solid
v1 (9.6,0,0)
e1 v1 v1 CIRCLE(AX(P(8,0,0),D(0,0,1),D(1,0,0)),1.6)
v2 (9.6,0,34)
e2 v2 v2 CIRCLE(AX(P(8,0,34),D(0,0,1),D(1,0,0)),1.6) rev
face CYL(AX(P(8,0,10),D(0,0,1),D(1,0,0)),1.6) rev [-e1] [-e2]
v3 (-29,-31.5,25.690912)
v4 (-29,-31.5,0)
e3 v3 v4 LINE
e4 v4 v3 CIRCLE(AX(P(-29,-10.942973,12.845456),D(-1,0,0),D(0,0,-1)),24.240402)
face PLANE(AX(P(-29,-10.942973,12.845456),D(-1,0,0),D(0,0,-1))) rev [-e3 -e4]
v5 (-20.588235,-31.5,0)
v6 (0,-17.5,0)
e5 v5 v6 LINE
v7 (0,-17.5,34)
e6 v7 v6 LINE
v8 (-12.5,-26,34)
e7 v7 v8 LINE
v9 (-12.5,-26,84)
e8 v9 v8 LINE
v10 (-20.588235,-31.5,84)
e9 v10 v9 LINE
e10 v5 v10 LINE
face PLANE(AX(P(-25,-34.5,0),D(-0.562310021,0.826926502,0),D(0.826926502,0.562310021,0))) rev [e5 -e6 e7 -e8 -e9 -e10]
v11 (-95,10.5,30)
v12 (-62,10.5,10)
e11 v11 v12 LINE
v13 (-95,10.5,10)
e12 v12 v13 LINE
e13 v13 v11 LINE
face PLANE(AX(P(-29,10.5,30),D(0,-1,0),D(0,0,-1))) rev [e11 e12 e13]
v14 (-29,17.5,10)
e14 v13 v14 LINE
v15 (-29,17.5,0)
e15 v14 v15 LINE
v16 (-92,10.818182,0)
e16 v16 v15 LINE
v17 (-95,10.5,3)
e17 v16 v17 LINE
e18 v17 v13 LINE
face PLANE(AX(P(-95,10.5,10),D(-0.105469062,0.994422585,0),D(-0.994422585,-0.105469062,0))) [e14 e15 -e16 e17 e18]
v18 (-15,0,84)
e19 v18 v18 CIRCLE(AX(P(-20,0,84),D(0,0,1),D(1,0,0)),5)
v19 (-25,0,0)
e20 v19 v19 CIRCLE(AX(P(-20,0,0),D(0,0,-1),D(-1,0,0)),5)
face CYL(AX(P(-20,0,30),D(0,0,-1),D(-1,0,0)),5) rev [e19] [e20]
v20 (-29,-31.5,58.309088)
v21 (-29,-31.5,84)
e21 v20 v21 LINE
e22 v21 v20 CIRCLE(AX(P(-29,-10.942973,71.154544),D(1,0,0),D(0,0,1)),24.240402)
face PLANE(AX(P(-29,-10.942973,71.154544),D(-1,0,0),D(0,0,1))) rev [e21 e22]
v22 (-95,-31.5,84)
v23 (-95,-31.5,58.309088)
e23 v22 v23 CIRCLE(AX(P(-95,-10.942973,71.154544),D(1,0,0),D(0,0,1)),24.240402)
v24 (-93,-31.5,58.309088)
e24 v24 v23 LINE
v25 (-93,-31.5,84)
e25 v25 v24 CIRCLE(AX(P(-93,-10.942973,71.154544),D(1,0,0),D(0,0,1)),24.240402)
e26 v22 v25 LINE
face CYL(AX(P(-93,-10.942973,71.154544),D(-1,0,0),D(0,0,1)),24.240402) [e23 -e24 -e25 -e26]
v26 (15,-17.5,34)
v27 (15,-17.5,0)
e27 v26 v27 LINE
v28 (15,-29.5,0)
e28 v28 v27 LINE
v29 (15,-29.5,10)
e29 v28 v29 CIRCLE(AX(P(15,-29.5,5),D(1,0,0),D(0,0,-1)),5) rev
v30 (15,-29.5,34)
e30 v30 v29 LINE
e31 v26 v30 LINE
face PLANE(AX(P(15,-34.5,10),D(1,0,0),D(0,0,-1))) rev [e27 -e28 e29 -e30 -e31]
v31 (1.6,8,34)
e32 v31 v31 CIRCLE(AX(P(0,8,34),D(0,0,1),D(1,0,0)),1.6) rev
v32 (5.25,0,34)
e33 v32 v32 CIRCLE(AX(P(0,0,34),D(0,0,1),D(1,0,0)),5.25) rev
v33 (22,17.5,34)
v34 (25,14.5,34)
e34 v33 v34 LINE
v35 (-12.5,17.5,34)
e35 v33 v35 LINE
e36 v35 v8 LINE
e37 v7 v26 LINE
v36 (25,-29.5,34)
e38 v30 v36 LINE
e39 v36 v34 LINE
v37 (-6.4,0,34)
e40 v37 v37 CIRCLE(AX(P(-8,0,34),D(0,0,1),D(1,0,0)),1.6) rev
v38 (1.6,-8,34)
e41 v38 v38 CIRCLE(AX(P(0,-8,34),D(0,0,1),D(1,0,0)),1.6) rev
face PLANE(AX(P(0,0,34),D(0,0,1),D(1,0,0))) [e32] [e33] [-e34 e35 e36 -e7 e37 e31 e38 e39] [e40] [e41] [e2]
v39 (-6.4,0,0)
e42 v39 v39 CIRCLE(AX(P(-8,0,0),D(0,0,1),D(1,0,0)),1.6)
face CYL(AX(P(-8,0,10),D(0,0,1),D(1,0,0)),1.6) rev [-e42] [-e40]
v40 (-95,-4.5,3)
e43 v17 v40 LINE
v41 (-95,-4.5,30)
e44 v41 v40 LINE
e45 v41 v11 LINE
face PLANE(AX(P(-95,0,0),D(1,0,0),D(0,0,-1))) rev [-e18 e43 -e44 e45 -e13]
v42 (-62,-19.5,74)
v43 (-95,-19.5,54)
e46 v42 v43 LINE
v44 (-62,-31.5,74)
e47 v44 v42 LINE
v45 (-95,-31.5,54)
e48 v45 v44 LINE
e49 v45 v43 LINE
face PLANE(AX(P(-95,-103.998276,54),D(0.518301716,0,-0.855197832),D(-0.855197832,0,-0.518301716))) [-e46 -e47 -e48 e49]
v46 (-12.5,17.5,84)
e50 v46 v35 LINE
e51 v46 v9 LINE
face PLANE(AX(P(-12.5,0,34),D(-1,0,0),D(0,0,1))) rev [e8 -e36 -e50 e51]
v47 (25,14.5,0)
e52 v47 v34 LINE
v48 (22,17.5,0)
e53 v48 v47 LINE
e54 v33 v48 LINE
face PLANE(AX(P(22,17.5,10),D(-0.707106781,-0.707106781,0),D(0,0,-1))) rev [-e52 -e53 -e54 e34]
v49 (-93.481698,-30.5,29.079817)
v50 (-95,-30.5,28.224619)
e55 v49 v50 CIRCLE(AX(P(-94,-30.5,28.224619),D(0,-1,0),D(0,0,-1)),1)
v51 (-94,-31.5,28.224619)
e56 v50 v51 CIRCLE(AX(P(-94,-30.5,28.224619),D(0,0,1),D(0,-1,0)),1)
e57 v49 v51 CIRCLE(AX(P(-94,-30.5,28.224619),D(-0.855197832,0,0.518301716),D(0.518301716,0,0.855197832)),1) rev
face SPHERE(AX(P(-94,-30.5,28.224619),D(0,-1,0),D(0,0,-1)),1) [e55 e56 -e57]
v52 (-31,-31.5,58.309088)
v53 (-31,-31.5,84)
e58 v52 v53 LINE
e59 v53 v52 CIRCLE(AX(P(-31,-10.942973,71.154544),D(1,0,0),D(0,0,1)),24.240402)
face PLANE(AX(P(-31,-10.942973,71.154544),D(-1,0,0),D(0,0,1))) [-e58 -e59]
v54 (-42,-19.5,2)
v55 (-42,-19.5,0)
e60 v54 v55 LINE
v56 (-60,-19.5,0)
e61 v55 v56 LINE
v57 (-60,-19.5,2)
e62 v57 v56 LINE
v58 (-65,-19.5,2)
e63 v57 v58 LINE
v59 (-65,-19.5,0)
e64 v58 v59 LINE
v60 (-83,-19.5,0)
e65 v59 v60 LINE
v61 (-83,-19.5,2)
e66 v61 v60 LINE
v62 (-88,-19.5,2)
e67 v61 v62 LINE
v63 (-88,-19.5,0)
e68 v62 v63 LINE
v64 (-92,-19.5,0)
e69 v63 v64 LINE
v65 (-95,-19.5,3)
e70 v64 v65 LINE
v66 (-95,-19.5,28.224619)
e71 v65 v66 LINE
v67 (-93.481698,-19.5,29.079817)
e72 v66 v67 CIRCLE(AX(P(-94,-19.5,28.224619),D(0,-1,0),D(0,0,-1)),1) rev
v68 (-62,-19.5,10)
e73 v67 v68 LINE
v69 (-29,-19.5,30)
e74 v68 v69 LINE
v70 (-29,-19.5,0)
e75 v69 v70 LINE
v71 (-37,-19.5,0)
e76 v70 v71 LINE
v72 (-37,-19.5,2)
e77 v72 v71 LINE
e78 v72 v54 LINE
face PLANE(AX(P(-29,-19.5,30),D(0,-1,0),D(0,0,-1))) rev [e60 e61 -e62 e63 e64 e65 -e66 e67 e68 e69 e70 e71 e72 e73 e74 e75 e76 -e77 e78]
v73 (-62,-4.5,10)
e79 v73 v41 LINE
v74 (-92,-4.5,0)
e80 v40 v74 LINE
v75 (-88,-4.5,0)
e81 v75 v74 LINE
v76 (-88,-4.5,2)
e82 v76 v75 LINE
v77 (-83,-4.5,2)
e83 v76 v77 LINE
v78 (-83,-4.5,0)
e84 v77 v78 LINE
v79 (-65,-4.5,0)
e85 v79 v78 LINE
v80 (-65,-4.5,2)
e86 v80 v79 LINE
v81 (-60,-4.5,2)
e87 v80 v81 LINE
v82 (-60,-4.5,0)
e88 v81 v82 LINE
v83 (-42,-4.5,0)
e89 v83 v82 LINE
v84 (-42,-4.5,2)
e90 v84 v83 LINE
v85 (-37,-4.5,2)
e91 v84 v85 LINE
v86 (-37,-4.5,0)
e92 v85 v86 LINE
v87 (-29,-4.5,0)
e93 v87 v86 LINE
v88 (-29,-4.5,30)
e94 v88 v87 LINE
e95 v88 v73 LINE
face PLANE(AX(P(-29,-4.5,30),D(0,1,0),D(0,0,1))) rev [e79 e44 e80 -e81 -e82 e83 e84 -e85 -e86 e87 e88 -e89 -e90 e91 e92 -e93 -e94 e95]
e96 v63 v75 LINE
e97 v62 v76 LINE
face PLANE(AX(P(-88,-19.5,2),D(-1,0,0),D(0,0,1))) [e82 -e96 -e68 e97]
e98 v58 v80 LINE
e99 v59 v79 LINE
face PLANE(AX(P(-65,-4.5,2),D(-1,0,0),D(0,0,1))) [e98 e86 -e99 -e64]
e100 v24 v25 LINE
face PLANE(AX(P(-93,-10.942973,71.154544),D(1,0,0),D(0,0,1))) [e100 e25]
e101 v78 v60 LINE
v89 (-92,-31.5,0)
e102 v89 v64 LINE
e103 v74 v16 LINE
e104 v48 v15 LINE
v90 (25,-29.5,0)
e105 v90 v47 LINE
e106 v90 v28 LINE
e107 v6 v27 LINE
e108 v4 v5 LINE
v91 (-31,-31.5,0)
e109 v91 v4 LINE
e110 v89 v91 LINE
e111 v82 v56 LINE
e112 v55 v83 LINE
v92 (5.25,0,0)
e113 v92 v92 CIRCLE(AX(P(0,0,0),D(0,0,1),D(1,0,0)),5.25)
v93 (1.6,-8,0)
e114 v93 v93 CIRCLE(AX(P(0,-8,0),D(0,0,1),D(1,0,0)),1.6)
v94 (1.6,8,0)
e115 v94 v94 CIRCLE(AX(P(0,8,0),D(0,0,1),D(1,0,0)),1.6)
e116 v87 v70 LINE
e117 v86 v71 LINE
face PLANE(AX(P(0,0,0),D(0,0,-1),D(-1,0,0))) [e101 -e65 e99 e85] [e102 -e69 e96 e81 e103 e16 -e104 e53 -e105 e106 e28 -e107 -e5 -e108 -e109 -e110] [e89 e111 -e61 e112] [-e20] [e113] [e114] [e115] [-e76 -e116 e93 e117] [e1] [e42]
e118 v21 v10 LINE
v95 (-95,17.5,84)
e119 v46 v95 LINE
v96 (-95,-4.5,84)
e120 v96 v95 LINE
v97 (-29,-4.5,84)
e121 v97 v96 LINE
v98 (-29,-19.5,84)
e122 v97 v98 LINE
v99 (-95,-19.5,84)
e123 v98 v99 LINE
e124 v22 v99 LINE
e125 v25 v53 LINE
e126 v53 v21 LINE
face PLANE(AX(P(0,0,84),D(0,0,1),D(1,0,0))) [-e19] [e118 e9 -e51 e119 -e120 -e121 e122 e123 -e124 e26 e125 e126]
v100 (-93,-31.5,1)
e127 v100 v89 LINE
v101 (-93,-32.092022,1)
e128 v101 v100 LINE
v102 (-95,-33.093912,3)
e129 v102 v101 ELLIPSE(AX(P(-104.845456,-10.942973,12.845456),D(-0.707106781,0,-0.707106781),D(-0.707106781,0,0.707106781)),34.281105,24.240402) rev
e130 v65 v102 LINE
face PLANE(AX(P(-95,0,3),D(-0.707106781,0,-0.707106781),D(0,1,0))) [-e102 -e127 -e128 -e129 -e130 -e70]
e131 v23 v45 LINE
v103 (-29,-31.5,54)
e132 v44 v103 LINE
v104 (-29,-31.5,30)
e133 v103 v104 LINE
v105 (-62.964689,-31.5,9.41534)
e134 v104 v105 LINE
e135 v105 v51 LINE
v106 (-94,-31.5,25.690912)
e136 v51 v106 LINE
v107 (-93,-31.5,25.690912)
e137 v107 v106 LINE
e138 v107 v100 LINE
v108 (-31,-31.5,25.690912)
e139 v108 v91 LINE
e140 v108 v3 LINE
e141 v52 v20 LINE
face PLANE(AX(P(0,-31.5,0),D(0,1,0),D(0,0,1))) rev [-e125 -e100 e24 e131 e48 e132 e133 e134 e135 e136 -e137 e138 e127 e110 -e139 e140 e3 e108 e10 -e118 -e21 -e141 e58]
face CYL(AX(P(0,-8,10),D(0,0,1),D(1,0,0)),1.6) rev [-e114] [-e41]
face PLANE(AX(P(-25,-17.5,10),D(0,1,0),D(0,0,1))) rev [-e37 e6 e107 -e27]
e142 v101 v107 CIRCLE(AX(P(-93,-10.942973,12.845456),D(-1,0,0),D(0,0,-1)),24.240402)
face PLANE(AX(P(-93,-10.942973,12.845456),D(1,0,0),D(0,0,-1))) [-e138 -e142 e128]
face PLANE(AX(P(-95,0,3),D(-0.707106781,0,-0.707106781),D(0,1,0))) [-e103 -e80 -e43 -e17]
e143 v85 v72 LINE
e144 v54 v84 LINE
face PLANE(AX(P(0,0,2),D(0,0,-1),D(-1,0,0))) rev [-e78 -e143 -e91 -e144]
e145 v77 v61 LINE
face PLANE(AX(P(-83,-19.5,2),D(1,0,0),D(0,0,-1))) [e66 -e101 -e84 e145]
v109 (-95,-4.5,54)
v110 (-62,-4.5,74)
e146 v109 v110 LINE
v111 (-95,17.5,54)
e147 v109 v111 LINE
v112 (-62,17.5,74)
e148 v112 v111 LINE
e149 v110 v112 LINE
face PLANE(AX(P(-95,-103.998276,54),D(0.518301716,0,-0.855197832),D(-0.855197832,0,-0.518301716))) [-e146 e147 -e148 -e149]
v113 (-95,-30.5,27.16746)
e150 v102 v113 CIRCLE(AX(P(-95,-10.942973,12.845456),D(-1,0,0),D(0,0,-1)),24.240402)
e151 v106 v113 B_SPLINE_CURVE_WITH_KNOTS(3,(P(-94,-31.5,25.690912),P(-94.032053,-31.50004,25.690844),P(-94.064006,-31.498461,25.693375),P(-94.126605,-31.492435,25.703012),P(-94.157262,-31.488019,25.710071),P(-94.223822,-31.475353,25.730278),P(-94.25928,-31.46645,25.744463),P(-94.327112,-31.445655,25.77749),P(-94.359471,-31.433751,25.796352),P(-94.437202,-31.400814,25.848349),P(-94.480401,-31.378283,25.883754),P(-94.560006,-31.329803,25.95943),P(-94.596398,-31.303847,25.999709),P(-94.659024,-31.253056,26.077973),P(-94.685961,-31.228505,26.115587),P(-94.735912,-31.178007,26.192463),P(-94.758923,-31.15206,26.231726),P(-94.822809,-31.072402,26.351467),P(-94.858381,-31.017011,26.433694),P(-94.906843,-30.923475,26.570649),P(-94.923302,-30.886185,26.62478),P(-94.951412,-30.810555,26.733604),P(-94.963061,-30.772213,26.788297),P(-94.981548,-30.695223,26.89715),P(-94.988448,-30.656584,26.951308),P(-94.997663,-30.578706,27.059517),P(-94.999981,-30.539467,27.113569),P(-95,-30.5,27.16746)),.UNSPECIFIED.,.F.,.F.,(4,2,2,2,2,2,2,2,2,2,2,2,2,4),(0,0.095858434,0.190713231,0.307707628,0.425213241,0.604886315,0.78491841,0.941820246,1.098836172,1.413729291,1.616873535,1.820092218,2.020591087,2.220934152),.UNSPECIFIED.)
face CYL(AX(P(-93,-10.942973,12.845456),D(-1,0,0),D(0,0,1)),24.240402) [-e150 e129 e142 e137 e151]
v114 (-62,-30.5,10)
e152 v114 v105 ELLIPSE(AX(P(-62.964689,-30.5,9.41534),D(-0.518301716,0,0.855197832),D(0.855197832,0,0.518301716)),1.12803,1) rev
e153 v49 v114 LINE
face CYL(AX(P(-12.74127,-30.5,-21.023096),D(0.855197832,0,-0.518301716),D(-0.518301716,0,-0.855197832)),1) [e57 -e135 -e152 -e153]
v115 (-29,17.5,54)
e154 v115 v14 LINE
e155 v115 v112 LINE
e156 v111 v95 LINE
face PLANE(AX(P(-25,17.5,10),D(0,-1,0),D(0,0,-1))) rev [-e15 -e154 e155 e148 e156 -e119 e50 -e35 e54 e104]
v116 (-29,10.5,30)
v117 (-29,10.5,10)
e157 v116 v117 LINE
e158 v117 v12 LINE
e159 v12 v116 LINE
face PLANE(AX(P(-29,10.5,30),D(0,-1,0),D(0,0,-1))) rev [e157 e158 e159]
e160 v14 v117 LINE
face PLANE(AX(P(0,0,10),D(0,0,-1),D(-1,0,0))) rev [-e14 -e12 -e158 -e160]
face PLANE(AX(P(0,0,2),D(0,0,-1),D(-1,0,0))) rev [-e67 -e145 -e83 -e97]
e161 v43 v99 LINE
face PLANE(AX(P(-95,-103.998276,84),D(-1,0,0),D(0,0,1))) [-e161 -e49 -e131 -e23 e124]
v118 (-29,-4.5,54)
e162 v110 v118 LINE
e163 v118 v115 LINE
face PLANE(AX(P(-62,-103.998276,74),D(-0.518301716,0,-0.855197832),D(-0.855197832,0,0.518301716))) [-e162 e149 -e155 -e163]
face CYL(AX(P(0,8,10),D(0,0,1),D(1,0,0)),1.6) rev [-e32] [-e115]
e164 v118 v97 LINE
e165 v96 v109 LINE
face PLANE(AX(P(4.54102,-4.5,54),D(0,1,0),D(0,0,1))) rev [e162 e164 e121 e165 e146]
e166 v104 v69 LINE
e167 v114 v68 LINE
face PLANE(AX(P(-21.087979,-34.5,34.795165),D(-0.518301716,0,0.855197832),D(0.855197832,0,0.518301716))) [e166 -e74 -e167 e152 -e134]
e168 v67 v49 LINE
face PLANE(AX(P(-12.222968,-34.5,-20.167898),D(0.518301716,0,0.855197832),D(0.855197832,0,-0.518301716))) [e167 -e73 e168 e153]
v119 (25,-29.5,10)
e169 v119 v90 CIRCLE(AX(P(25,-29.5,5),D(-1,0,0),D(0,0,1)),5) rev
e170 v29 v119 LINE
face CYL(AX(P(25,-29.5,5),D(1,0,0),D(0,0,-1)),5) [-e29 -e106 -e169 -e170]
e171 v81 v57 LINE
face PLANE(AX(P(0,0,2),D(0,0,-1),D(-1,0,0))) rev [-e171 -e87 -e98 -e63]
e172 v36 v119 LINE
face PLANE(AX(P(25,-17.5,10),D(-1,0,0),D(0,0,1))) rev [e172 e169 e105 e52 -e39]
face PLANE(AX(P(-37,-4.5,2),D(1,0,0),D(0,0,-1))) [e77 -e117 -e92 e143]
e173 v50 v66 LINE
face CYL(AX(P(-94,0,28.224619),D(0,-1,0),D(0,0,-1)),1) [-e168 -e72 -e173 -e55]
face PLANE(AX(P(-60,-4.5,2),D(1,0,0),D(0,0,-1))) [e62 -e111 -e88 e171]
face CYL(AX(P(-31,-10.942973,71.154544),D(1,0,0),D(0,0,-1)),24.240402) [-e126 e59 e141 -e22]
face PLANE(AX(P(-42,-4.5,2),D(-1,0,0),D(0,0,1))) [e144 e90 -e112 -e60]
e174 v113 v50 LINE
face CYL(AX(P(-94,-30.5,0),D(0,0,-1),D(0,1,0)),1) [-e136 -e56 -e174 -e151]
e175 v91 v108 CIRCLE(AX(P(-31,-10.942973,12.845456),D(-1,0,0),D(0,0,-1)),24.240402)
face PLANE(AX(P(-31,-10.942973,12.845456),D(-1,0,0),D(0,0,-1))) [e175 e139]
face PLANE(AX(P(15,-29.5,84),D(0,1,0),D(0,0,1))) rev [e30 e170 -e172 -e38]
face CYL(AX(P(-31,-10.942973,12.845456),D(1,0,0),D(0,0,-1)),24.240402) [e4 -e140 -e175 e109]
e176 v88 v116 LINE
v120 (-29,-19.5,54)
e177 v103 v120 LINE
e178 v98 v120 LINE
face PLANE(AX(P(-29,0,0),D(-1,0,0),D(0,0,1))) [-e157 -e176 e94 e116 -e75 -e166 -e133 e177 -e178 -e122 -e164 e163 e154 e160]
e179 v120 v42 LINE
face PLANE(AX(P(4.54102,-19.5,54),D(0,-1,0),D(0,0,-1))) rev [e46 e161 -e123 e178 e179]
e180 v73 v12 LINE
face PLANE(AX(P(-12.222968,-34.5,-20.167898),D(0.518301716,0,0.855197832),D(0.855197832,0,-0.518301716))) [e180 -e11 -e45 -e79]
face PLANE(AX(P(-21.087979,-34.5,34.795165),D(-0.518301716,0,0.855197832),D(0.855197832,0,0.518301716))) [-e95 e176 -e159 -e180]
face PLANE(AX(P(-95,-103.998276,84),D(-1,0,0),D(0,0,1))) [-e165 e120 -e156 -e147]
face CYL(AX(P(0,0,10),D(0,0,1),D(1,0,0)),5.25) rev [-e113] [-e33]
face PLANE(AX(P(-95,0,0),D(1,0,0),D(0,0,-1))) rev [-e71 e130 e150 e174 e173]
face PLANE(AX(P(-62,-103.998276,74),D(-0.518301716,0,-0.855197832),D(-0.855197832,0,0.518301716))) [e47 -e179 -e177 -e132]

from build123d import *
from build123d.topology import SkipClean

# Parameters (mm, degrees)
SKETCH_1_W            = 50
SKETCH_1_H            = 35
EXTRUDE_1_DEPTH       = 10
HOLE_WIZARD_370_D     = 10.5
HOLE_WIZARD_475_D     = 3.2
SKETCH_6_W            = 10
SKETCH_6_H            = 52
EXTRUDE_2_DEPTH       = 70
EXTRUDE_3_DEPTH       = 52
SKETCH_10_W           = 30
SKETCH_10_H           = 15
SKETCH_10_H_2         = 7
CUT_EXTRUDE_1_DEPTH   = 66
SKETCH_12_W           = 5
SKETCH_12_H           = 15
EXTRUDE_4_DEPTH       = 2
EXTRUDE_5_DEPTH       = 10
RIB_6_REACH           = 107.429
SKETCH_15_WALL_W      = 243.090204886
SKETCH_15_WALL_H      = 10
SKETCH_16_W           = 10
SKETCH_16_H           = 10
EXTRUDE_6_DEPTH       = 17
FILLET_1_RADIUS       = 5
FILLET_1_LENGTH       = 10
CUT_EXTRUDE_3_DEPTH   = 3
EXTRUDE_8_DEPTH       = 2
FILLET_3_R            = 1
SKETCH_20_R           = 5
CUT_EXTRUDE_4_DEPTH   = 106.654483654
CHAMFER_3_SIZE        = 3
SKETCH_22_R           = 1.6
SKETCH_22_R_2         = 4.65
SKETCH_22_R_3         = 5.25
EXTRUDE_9_DEPTH       = 74
EXTRUDE_10_DEPTH      = 49
SKETCH_25_W           = 30
SKETCH_25_H           = 15
CUT_EXTRUDE_5_DEPTH   = 66
SKETCH_26_R           = 12.5
CUT_EXTRUDE_6_DEPTH   = 50
SKETCH_27_W           = 25
SKETCH_27_H           = 70.37051412
SKETCH_27_W_2         = 27.110275364
CUT_EXTRUDE_7_DEPTH   = 50
SKETCH_28_R           = 5
CUT_EXTRUDE_8_DEPTH   = 132.601177488
MIRROR_2_COPY_1_DEPTH = 2


with BuildPart() as part:
    # 草图1 → 凸台-拉伸1 (new body)
    with BuildSketch(Plane.XY):
        Rectangle(SKETCH_1_W, SKETCH_1_H)
    extrude(amount=EXTRUDE_1_DEPTH)

    # Hole Wizard 370 (through all)
    with Locations(Plane.XY.offset(10)):
        with Locations((0, 0)):
            Hole(HOLE_WIZARD_370_D / 2)

    # Hole Wizard 475 (through all)
    with Locations(Plane.XY.offset(10)):
        with Locations((8, 0), (0, 8), (-8, 0), (0, -8)):
            Hole(HOLE_WIZARD_475_D / 2)

    # 草图6 → 凸台-拉伸2 (add)
    with BuildSketch(Plane.ZY.offset(25)):
        with Locations((5, -8.5)):
            Rectangle(SKETCH_6_W, SKETCH_6_H)
    extrude(amount=EXTRUDE_2_DEPTH)

    # 草图9 → 凸台-拉伸3 (add, through all)
    with BuildSketch(Plane(origin=(0, 17.5, 0), x_dir=(1, 0, 0), z_dir=(0, 1, 0))):
        Polygon((-95, -30), (-62, -10), (-95, -10), align=None)
        Polygon((-29, -30), (-29, -10), (-62, -10), align=None)
    extrude(amount=-EXTRUDE_3_DEPTH)

    # 草图10 → 切除-拉伸1 (cut)
    with BuildSketch(Plane.ZY.offset(95)):
        with Locations((15, -12)):
            Rectangle(SKETCH_10_W, SKETCH_10_H)
        with Locations((15, 14)):
            Rectangle(SKETCH_10_W, SKETCH_10_H_2)
    extrude(amount=-CUT_EXTRUDE_1_DEPTH, mode=Mode.SUBTRACT)

    # 草图12 → 凸台-拉伸4 (add)
    with BuildSketch(Plane(origin=(0, 0, 0), x_dir=(-1, 0, 0), z_dir=(0, 0, -1))):
        with Locations((85.5, -12)):
            Rectangle(SKETCH_12_W, SKETCH_12_H)
        with Locations((39.5, -12)):
            Rectangle(SKETCH_12_W, SKETCH_12_H)
        with Locations((62.5, -12)):
            Rectangle(SKETCH_12_W, SKETCH_12_H)
    extrude(amount=-EXTRUDE_4_DEPTH)

    # 草图14 → 凸台-拉伸5 (add)
    with BuildSketch(Plane(origin=(0, 0, 0), x_dir=(-1, 0, 0), z_dir=(0, 0, -1))):
        Polygon((95, 10.5), (29, 17.5), (29, 10.5), align=None)
    extrude(amount=-EXTRUDE_5_DEPTH)

    # 草图15 wall → 筋6 (add, up to next)
    with BuildSketch(Plane(origin=(-12.5, -26, 0), x_dir=(0.82692650207, 0.562310021407, 0), z_dir=(0.562310021407, -0.82692650207, 0)), mode=Mode.PRIVATE) as rib_6_sk1:
        with Locations((0, 5)):
            Rectangle(SKETCH_15_WALL_W, SKETCH_15_WALL_H)
    rib_6_tool1 = extrude(rib_6_sk1.sketch, amount=-RIB_6_REACH, mode=Mode.PRIVATE) - part.part
    add(rib_6_tool1.solids().sort_by_distance((-12.5, -26, 0))[0])

    # 草图16 → 凸台-拉伸6 (add)
    with BuildSketch(Plane.XZ.offset(17.5)):
        with Locations((20, 5)):
            Rectangle(SKETCH_16_W, SKETCH_16_H)
    extrude(amount=EXTRUDE_6_DEPTH)

    # 圆角1: full round fillet: the end face becomes a half cylinder, R = half its width
    fillet_1_face = Plane((20, -34.5, 5), x_dir=(-1, 0, 0), z_dir=(0, -1, 0))  # on the end face: x along it, z out of the body
    fillet_1_slab = fillet_1_face.offset(-FILLET_1_RADIUS / 2) * Box(FILLET_1_LENGTH, 2 * FILLET_1_RADIUS, FILLET_1_RADIUS, mode=Mode.PRIVATE)  # the body's end, R deep
    fillet_1_round = Plane((20, -29.5, 5), x_dir=(0, -1, 0), z_dir=(-1, 0, 0)) * Cylinder(FILLET_1_RADIUS, FILLET_1_LENGTH, mode=Mode.PRIVATE)  # its axis R under the face
    add(fillet_1_slab - fillet_1_round, mode=Mode.SUBTRACT)

    # 草图17 → 切除-拉伸3 (cut)
    with BuildSketch(Plane.XZ.offset(34.5)):
        Polygon((-95, 30), (-62, 10), (-29, 30), (-29, 10), (-17.881583213, 10), (-17.881583213, 0), (-29, 0), (-95, 0), align=None)
    extrude(amount=-CUT_EXTRUDE_3_DEPTH, mode=Mode.SUBTRACT)

    # 草图19 → 凸台-拉伸8 (add)
    with BuildSketch(Plane.ZY.offset(95)):
        with BuildLine():
            Line((25.690911714, -31.5), (0, -31.5))
            ThreePointArc((0, -31.5), (12.845455857, -35.183375195), (25.690911714, -31.5))
        make_face()
    extrude_8 = extrude(amount=-EXTRUDE_8_DEPTH)

    # 圆角3
    fillet_3_edges = [part.edges().sort_by_distance(p)[0] for p in [
        (-95, -25.5, 30),
        (-95, -31.5, 27.845455857),
        (-78.5, -31.5, 20),
    ]]
    fillet(fillet_3_edges, radius=FILLET_3_R)

    # 草图20 → 切除-拉伸4 (cut, through all)
    with BuildSketch(Plane(origin=(0, 0, 0), x_dir=(-1, 0, 0), z_dir=(0, 0, -1))):
        with Locations((20, 0)):
            Circle(SKETCH_20_R)
    extrude(amount=-CUT_EXTRUDE_4_DEPTH, mode=Mode.SUBTRACT)

    # 倒角3
    # the kernel refuses this chamfer: 3 mm, written as the material it takes off along each edge
    with BuildSketch(Plane(origin=(25, 17.5, -7.715048964), x_dir=(0.02749587661058678, -0.9996219169112968, 0), z_dir=(0, 0, 1))) as chamfer_3_piece_1:
        Polygon((CHAMFER_3_SIZE * 0.999621916911, -CHAMFER_3_SIZE * 0.0274958766106), (-CHAMFER_3_SIZE * 0.0274958766106, -CHAMFER_3_SIZE * 0.999621916911), (0, 0), align=None)
    extrude(amount=25.430097928, mode=Mode.SUBTRACT)
    with BuildSketch(Plane(origin=(-95, 18.215048964, 0), x_dir=(0.9996219169112968, 0, -0.02749587661058636), z_dir=(0, -1, 0))) as chamfer_3_piece_2:
        Polygon((CHAMFER_3_SIZE * 0.999621916911, CHAMFER_3_SIZE * 0.0274958766106), (-CHAMFER_3_SIZE * 0.0274958766106, CHAMFER_3_SIZE * 0.999621916911), (0, 0), align=None)
    extrude(amount=30.430097928, mode=Mode.SUBTRACT)
    with BuildSketch(Plane(origin=(-95, -11.784951036, 0), x_dir=(-0.027495876610586778, 0, 0.9996219169112968), z_dir=(0, -1, 0))) as chamfer_3_piece_3:
        Polygon((CHAMFER_3_SIZE * 0.999621916911, -CHAMFER_3_SIZE * 0.0274958766106), (-CHAMFER_3_SIZE * 0.0274958766106, -CHAMFER_3_SIZE * 0.999621916911), (0, 0), align=None)
    extrude(amount=27.430097928, mode=Mode.SUBTRACT)

    # 草图22 → 凸台-拉伸9 (add)
    with SkipClean():  # the faces are left unmerged after this step: merging them gives an invalid solid
        with BuildSketch(Plane.XY.offset(10)):
            Polygon((-29, 17.5), (-29, -31.5), (-20.588235294, -31.5), (0, -17.5), (15, -17.5), (15, -29.5), (25, -29.5), (25, 14.5), (22, 17.5), align=None)
            with Locations((0, -8)):
                Circle(SKETCH_22_R, mode=Mode.SUBTRACT)
            with Locations((0, 8)):
                Circle(SKETCH_22_R, mode=Mode.SUBTRACT)
            with Locations((8, 0)):
                Circle(SKETCH_22_R, mode=Mode.SUBTRACT)
            with Locations((-8, 0)):
                Circle(SKETCH_22_R, mode=Mode.SUBTRACT)
            with Locations((-20, 0)):
                Circle(SKETCH_22_R_2, mode=Mode.SUBTRACT)
            Circle(SKETCH_22_R_3, mode=Mode.SUBTRACT)
        extrude(amount=EXTRUDE_9_DEPTH)
    add(part.part.scale(1), mode=Mode.REPLACE)  # the faces are merged on a copy

    # 草图24 → 凸台-拉伸10 (add)
    with SkipClean():  # the faces are left unmerged after this step: merging them gives an invalid solid
        with BuildSketch(Plane(origin=(0, 17.5, 0), x_dir=(1, 0, 0), z_dir=(0, 1, 0))):
            Polygon((-95, -74), (-95, -54), (-62, -74), (-29, -54), (-29, -74), (-29, -84), (-95, -84), align=None)
        extrude(amount=-EXTRUDE_10_DEPTH)

    # 草图25 → 切除-拉伸5 (cut)
    with SkipClean():  # the faces are left unmerged after this step: merging them gives an invalid solid
        with BuildSketch(Plane.ZY.offset(95)):
            with Locations((69, -12)):
                Rectangle(SKETCH_25_W, SKETCH_25_H)
        extrude(amount=-CUT_EXTRUDE_5_DEPTH, mode=Mode.SUBTRACT)

    # 草图26 → 切除-拉伸6 (cut)
    with BuildSketch(Plane.XY.offset(84)):
        Circle(SKETCH_26_R)
    extrude(amount=-CUT_EXTRUDE_6_DEPTH, mode=Mode.SUBTRACT)

    # 草图27 → 切除-拉伸7 (cut)
    with BuildSketch(Plane.XY.offset(84)):
        Rectangle(SKETCH_27_W, SKETCH_27_H)
        with Locations((26.055137682, 0)):
            Rectangle(SKETCH_27_W_2, SKETCH_27_H)
    extrude(amount=-CUT_EXTRUDE_7_DEPTH, mode=Mode.SUBTRACT)

    # 镜向1: 凸台-拉伸8 across plane
    add(extrude_8.mirror(Plane(origin=(0, 0, 42), x_dir=(1, 0, 0), z_dir=(0, 0, -1))))

    # 草图28 → 切除-拉伸8 (cut, through all)
    with BuildSketch(Plane.XY.offset(84)):
        with Locations(Location((-20, 0, 0), (0, 0, 180))):
            Circle(SKETCH_28_R)
    extrude(amount=-CUT_EXTRUDE_8_DEPTH, mode=Mode.SUBTRACT)

    # 镜向2: 凸台-拉伸8 across plane
    add(extrude_8.mirror(Plane.ZY.offset(62)))

    # 镜向2 copy 1 sketch → 镜向2 copy 1 (add)
    with BuildSketch(Plane(origin=(-29, 0, 84), x_dir=(0, 0, -1), z_dir=(1, 0, 0))):
        with BuildLine():
            Line((25.690911714, -31.5), (0, -31.5))
            ThreePointArc((0, -31.5), (12.845455857, -35.183375195), (25.690911714, -31.5))
        make_face()
    extrude(amount=-MIRROR_2_COPY_1_DEPTH)


solid = part.part
